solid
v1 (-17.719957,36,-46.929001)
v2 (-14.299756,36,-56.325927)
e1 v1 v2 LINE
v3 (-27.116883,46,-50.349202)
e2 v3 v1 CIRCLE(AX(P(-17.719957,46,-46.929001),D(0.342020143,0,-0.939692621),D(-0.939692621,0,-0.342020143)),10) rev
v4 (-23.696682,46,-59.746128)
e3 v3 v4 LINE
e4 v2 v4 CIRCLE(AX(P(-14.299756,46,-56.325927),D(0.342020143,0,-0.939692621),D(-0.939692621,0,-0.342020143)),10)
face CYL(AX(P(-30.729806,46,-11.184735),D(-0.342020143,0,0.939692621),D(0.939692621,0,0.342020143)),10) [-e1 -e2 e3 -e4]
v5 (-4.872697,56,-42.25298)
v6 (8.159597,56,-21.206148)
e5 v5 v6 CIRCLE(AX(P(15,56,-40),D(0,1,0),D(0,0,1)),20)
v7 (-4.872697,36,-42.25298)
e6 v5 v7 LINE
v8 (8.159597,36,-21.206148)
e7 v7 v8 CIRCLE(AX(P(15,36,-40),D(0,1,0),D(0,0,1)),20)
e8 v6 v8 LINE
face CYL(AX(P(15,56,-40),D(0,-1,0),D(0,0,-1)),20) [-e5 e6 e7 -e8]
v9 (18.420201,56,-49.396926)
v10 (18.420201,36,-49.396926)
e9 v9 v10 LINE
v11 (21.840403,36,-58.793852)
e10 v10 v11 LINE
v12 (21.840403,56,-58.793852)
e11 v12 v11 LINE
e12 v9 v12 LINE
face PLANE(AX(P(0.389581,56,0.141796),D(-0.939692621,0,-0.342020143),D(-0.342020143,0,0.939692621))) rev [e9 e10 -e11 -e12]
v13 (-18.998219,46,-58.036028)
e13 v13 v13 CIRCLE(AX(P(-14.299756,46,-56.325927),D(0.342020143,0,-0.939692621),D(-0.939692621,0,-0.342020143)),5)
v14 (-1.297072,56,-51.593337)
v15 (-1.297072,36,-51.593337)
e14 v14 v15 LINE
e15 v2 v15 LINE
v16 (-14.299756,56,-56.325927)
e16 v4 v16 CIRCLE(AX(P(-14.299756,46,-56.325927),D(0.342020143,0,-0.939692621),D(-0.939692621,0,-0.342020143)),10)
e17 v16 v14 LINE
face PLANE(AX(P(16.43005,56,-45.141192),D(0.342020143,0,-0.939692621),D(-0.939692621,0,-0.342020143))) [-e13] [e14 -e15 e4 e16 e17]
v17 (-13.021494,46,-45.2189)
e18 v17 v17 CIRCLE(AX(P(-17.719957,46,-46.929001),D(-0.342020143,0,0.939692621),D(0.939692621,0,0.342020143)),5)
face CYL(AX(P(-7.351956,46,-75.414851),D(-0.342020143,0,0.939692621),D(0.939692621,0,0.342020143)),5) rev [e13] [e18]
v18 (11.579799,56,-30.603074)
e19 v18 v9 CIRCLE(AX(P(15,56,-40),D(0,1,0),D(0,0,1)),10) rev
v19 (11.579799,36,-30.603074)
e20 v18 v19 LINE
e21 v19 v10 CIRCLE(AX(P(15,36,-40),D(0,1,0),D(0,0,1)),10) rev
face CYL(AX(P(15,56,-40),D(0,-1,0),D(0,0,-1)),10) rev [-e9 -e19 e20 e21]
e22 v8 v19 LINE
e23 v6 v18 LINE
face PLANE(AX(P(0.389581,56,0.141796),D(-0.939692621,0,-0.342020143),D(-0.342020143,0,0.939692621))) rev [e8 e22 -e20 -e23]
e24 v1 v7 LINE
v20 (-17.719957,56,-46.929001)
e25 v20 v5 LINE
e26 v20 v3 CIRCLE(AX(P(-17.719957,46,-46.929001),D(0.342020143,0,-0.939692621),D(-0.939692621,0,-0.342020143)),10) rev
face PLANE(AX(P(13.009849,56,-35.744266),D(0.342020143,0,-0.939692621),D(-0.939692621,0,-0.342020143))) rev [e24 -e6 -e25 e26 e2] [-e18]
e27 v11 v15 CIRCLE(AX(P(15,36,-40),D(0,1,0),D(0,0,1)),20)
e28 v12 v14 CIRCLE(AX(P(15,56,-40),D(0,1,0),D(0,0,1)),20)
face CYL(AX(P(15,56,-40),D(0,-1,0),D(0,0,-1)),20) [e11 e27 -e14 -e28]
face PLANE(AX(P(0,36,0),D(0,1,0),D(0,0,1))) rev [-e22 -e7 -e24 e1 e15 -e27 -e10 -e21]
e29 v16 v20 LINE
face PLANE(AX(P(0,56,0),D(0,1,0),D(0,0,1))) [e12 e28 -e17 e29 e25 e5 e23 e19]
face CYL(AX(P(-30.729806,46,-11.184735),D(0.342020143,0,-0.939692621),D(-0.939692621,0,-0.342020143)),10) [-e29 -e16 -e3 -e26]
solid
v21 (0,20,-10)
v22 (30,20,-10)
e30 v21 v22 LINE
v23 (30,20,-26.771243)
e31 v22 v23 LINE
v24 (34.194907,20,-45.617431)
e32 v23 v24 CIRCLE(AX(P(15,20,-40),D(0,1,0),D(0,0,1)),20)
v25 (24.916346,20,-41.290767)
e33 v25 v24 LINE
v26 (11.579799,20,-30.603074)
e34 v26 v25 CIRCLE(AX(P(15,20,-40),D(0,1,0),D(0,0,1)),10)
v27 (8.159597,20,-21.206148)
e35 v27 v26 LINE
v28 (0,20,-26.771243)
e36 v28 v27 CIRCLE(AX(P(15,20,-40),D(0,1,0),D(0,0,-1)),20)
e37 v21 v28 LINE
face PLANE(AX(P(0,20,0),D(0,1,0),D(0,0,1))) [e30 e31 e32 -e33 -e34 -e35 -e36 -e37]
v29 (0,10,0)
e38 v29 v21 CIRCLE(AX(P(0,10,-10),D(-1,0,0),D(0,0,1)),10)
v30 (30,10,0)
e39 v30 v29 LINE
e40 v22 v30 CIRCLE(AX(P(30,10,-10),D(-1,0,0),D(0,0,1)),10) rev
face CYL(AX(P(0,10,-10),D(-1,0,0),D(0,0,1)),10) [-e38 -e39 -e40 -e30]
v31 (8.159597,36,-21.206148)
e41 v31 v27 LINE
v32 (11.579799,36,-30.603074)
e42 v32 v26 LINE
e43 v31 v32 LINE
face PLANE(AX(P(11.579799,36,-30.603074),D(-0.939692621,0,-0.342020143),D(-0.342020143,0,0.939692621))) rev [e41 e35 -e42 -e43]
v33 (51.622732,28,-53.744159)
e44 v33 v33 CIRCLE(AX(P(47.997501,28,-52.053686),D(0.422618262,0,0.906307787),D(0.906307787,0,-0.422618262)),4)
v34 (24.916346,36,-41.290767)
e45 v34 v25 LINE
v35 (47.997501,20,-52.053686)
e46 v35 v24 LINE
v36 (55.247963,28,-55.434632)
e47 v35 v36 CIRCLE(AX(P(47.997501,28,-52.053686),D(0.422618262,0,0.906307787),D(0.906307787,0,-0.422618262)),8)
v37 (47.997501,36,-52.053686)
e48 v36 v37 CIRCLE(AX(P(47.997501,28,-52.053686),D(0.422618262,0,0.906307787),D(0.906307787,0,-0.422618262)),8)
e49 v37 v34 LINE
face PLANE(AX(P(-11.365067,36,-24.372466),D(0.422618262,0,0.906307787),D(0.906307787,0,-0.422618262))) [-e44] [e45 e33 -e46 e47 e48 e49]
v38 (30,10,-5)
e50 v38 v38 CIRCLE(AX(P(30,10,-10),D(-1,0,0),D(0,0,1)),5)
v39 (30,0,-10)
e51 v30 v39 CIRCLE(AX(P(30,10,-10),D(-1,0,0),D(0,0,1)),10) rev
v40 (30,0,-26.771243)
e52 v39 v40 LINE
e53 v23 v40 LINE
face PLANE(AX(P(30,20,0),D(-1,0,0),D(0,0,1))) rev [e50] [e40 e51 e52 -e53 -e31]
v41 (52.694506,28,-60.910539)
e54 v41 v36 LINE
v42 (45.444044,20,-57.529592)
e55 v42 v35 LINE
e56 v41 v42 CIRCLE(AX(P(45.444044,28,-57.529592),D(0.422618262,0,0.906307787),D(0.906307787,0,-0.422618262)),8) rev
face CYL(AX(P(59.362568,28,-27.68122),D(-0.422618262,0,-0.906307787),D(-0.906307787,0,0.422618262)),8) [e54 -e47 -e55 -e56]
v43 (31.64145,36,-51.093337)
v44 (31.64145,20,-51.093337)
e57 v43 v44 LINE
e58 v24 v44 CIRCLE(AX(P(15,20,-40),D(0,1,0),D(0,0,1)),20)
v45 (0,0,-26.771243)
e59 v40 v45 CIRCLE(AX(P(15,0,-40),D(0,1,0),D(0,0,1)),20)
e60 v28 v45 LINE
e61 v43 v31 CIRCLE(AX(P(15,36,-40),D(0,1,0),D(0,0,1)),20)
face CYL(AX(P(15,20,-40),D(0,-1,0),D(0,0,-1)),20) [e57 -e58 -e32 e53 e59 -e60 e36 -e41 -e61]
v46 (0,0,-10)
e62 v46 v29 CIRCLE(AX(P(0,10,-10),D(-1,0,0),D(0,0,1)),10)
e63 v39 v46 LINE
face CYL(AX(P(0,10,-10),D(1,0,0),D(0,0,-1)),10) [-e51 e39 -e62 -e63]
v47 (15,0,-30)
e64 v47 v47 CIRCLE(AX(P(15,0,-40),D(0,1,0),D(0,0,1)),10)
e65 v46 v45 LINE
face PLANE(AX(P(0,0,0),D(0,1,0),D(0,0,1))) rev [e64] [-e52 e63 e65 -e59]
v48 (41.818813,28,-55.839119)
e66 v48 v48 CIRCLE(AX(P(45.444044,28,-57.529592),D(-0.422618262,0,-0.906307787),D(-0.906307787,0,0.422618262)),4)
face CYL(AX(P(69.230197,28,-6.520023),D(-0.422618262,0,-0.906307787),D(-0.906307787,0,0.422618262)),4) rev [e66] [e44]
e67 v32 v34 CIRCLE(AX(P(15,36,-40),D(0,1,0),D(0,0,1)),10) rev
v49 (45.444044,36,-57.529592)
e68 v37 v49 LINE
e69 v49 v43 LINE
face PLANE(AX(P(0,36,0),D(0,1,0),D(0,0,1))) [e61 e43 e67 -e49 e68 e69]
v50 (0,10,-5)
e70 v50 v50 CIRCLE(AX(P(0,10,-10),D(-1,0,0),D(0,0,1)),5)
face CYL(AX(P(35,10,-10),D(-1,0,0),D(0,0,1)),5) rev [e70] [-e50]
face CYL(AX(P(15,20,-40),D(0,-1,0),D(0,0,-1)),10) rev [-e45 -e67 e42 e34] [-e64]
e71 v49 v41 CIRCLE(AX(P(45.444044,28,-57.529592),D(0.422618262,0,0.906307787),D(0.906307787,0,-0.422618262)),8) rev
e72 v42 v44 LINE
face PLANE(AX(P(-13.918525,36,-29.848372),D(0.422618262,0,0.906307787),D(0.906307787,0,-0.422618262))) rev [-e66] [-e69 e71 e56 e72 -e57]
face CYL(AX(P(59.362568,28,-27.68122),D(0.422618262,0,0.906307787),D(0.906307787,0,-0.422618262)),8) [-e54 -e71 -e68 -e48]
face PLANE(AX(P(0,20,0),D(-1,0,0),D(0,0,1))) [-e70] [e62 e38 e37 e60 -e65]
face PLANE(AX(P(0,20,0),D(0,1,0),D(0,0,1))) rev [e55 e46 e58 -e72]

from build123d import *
from build123d.topology import SkipClean

# Parameters (mm, degrees)
EXTRUDE_4_DEPTH     = 20
FILLET_2_R          = 10
SKETCH_5_R          = 5
CUT_EXTRUDE_1_DEPTH = 73.284161474
EXTRUDE_START       = 16
EXTRUDE_6_DEPTH     = 20
FILLET_3_R          = 10
SKETCH_9_R          = 5
CUT_EXTRUDE_2_DEPTH = 78.613189577
EXTRUDE_7_DEPTH     = 16
FILLET_4_R          = 8
SKETCH_13_R         = 4
CUT_EXTRUDE_3_DEPTH = 95.259541887
EXTRUDE_8_DEPTH     = 16


with BuildPart() as part:
    # 草图1 → 凸台-拉伸4 (new body)
    with BuildSketch(Plane(origin=(0, 0, 0), x_dir=(1, 0, 0), z_dir=(0, 1, 0))):
        with BuildLine():
            ThreePointArc((15, 60), (-3.228756555, 48.228756555), (0, 26.771243445))
            ThreePointArc((0, 26.771243445), (6.771243445, 21.771243445), (15, 20))
            Line((15, 20), (15, 30))
            ThreePointArc((15, 30), (5, 40), (15, 50))
            Line((15, 50), (15, 60))
        make_face()
        with BuildLine():
            ThreePointArc((35, 40), (29.142135624, 54.142135624), (15, 60))
            Line((15, 60), (15, 50))
            ThreePointArc((15, 50), (22.071067812, 47.071067812), (25, 40))
            ThreePointArc((25, 40), (22.071067812, 32.928932188), (15, 30))
            Line((15, 30), (15, 20))
            ThreePointArc((15, 20), (23.228756555, 21.771243445), (30, 26.771243445))
            ThreePointArc((30, 26.771243445), (33.708286934, 32.928932188), (35, 40))
        make_face()
        with BuildLine():
            ThreePointArc((15, 60), (-3.228756555, 48.228756555), (0, 26.771243445))
            ThreePointArc((0, 26.771243445), (6.771243445, 21.771243445), (15, 20))
            Line((15, 20), (15, 30))
            ThreePointArc((15, 30), (5, 40), (15, 50))
            Line((15, 50), (15, 60))
        make_face()
        with BuildLine():
            ThreePointArc((35, 40), (29.142135624, 54.142135624), (15, 60))
            Line((15, 60), (15, 50))
            ThreePointArc((15, 50), (22.071067812, 47.071067812), (25, 40))
            ThreePointArc((25, 40), (22.071067812, 32.928932188), (15, 30))
            Line((15, 30), (15, 20))
            ThreePointArc((15, 20), (23.228756555, 21.771243445), (30, 26.771243445))
            ThreePointArc((30, 26.771243445), (33.708286934, 32.928932188), (35, 40))
        make_face()
        with BuildLine():
            Line((0, 26.771243445), (0, 0))
            Line((0, 0), (15, 0))
            Line((15, 0), (15, 20))
            ThreePointArc((15, 20), (6.771243445, 21.771243445), (0, 26.771243445))
        make_face()
        with BuildLine():
            Line((15, 20), (15, 0))
            Line((15, 0), (30, 0))
            Line((30, 0), (30, 26.771243445))
            ThreePointArc((30, 26.771243445), (23.228756555, 21.771243445), (15, 20))
        make_face()
    extrude(amount=EXTRUDE_4_DEPTH)

    # 圆角2
    fillet_2_edges = [part.edges().sort_by_distance(p)[0] for p in [
        (15, 0, 0),
        (15, 20, 0),
    ]]
    fillet(fillet_2_edges, radius=FILLET_2_R - 0.0001)  # a hair under: the kernel refuses the full size

    # 草图5 → 切除-拉伸1 (cut, through all)
    with BuildSketch(Plane.ZY):
        with Locations((-10, 10)):
            Circle(SKETCH_5_R)
    extrude(amount=-CUT_EXTRUDE_1_DEPTH, mode=Mode.SUBTRACT)

    # 草图11 → 凸台-拉伸7 (add)
    with BuildSketch(Plane(origin=(0, 20, 0), x_dir=(1, 0, 0), z_dir=(0, 1, 0))):
        with BuildLine():
            Line((21.840402867, 58.793852416), (18.420201433, 49.396926208))
            ThreePointArc((18.420201433, 49.396926208), (22.803417949, 46.253532466), (24.916346187, 41.290766554))
            Line((24.916346187, 41.290766554), (55.247963432, 55.434631959))
            Line((55.247963432, 55.434631959), (52.694506253, 60.910538551))
            Line((52.694506253, 60.910538551), (31.641450271, 51.093337319))
            ThreePointArc((31.641450271, 51.093337319), (27.356125602, 55.726606758), (21.840402867, 58.793852416))
        make_face()
    extrude(amount=EXTRUDE_7_DEPTH)

    # 圆角4
    fillet_4_edges = [part.edges().sort_by_distance(p)[0] for p in [
        (53.971234843, 20, -58.172585255),
        (53.971234843, 36, -58.172585255),
    ]]
    fillet(fillet_4_edges, radius=FILLET_4_R - 0.0001)  # a hair under: the kernel refuses the full size

    # 草图13 → 切除-拉伸3 (cut, through all)
    with BuildSketch(Plane(origin=(-13.918524524, 0, -29.848372166), x_dir=(-0.9063077870366495, 0, 0.42261826174070066), z_dir=(-0.42261826174070066, 0, -0.9063077870366495))):
        with Locations((-65.499347275, 28)):
            Circle(SKETCH_13_R)
    extrude(amount=-CUT_EXTRUDE_3_DEPTH, mode=Mode.SUBTRACT)

    # 草图15 → 凸台-拉伸8 (add)
    with SkipClean():  # the faces are left unmerged after this step: merging them gives an invalid solid
        with BuildSketch(Plane(origin=(0, 20, 0), x_dir=(1, 0, 0), z_dir=(0, 1, 0))):
            with BuildLine():
                Line((11.579798567, 30.603073792), (8.159597133, 21.206147584))
                ThreePointArc((8.159597133, 21.206147584), (-3.793852416, 46.840402867), (21.840402867, 58.793852416))
                Line((21.840402867, 58.793852416), (18.420201433, 49.396926208))
                ThreePointArc((18.420201433, 49.396926208), (5.603073792, 43.420201433), (11.579798567, 30.603073792))
            make_face()
        extrude(amount=EXTRUDE_8_DEPTH)


with BuildPart() as body_2:
    # 草图7 → 凸台-拉伸6 (new body)
    with BuildSketch(Plane(origin=(0, 20, 0), x_dir=(1, 0, 0), z_dir=(0, 1, 0)).offset(EXTRUDE_START)):
        with BuildLine():
            Line((18.420201433, 49.396926208), (21.840402867, 58.793852416))
            ThreePointArc((21.840402867, 58.793852416), (18.472963553, 59.69615506), (15, 60))
            Line((15, 60), (15, 50))
            ThreePointArc((15, 50), (16.736481777, 49.84807753), (18.420201433, 49.396926208))
        make_face()
        with BuildLine():
            Line((15, 50), (15, 60))
            ThreePointArc((15, 60), (5.831214309, 57.774514591), (-1.297071505, 51.593336895))
            ThreePointArc((-1.297071505, 51.593336895), (-3.678158381, 47.150272687), (-4.872696835, 42.25298036))
            ThreePointArc((-4.872696835, 42.25298036), (-4.077402617, 33.995609158), (0, 26.771243445))
            ThreePointArc((0, 26.771243445), (3.73086639, 23.477087797), (8.159597133, 21.206147584))
            Line((8.159597133, 21.206147584), (11.579798567, 30.603073792))
            ThreePointArc((11.579798567, 30.603073792), (5.15192247, 41.736481777), (15, 50))
        make_face()
        with BuildLine():
            ThreePointArc((-4.872696835, 42.25298036), (-3.678158381, 47.150272687), (-1.297071505, 51.593336895))
            Line((-1.297071505, 51.593336895), (-23.696681977, 59.746128366))
            Line((-23.696681977, 59.746128366), (-27.11688341, 50.349202158))
            Line((-27.11688341, 50.349202158), (-4.872696835, 42.25298036))
        make_face()
    extrude(amount=EXTRUDE_6_DEPTH)

    # 圆角3
    fillet_3_edges = [body_2.edges().sort_by_distance(p)[0] for p in [
        (-25.406782694, 36, -55.047665262),
        (-25.406782694, 56, -55.047665262),
    ]]
    fillet(fillet_3_edges, radius=FILLET_3_R - 0.0001)  # a hair under: the kernel refuses the full size

    # 草图9 → 切除-拉伸2 (cut, through all)
    with BuildSketch(Plane(origin=(13.009848873, 0, -35.744266009), x_dir=(0.9396926207859082, 0, 0.34202014332566943), z_dir=(-0.34202014332566943, 0, 0.9396926207859082))):
        with Locations((-32.701976578, 46)):
            Circle(SKETCH_9_R)
    extrude(amount=-CUT_EXTRUDE_2_DEPTH, mode=Mode.SUBTRACT)


solid = Compound([part.part, body_2.part])
